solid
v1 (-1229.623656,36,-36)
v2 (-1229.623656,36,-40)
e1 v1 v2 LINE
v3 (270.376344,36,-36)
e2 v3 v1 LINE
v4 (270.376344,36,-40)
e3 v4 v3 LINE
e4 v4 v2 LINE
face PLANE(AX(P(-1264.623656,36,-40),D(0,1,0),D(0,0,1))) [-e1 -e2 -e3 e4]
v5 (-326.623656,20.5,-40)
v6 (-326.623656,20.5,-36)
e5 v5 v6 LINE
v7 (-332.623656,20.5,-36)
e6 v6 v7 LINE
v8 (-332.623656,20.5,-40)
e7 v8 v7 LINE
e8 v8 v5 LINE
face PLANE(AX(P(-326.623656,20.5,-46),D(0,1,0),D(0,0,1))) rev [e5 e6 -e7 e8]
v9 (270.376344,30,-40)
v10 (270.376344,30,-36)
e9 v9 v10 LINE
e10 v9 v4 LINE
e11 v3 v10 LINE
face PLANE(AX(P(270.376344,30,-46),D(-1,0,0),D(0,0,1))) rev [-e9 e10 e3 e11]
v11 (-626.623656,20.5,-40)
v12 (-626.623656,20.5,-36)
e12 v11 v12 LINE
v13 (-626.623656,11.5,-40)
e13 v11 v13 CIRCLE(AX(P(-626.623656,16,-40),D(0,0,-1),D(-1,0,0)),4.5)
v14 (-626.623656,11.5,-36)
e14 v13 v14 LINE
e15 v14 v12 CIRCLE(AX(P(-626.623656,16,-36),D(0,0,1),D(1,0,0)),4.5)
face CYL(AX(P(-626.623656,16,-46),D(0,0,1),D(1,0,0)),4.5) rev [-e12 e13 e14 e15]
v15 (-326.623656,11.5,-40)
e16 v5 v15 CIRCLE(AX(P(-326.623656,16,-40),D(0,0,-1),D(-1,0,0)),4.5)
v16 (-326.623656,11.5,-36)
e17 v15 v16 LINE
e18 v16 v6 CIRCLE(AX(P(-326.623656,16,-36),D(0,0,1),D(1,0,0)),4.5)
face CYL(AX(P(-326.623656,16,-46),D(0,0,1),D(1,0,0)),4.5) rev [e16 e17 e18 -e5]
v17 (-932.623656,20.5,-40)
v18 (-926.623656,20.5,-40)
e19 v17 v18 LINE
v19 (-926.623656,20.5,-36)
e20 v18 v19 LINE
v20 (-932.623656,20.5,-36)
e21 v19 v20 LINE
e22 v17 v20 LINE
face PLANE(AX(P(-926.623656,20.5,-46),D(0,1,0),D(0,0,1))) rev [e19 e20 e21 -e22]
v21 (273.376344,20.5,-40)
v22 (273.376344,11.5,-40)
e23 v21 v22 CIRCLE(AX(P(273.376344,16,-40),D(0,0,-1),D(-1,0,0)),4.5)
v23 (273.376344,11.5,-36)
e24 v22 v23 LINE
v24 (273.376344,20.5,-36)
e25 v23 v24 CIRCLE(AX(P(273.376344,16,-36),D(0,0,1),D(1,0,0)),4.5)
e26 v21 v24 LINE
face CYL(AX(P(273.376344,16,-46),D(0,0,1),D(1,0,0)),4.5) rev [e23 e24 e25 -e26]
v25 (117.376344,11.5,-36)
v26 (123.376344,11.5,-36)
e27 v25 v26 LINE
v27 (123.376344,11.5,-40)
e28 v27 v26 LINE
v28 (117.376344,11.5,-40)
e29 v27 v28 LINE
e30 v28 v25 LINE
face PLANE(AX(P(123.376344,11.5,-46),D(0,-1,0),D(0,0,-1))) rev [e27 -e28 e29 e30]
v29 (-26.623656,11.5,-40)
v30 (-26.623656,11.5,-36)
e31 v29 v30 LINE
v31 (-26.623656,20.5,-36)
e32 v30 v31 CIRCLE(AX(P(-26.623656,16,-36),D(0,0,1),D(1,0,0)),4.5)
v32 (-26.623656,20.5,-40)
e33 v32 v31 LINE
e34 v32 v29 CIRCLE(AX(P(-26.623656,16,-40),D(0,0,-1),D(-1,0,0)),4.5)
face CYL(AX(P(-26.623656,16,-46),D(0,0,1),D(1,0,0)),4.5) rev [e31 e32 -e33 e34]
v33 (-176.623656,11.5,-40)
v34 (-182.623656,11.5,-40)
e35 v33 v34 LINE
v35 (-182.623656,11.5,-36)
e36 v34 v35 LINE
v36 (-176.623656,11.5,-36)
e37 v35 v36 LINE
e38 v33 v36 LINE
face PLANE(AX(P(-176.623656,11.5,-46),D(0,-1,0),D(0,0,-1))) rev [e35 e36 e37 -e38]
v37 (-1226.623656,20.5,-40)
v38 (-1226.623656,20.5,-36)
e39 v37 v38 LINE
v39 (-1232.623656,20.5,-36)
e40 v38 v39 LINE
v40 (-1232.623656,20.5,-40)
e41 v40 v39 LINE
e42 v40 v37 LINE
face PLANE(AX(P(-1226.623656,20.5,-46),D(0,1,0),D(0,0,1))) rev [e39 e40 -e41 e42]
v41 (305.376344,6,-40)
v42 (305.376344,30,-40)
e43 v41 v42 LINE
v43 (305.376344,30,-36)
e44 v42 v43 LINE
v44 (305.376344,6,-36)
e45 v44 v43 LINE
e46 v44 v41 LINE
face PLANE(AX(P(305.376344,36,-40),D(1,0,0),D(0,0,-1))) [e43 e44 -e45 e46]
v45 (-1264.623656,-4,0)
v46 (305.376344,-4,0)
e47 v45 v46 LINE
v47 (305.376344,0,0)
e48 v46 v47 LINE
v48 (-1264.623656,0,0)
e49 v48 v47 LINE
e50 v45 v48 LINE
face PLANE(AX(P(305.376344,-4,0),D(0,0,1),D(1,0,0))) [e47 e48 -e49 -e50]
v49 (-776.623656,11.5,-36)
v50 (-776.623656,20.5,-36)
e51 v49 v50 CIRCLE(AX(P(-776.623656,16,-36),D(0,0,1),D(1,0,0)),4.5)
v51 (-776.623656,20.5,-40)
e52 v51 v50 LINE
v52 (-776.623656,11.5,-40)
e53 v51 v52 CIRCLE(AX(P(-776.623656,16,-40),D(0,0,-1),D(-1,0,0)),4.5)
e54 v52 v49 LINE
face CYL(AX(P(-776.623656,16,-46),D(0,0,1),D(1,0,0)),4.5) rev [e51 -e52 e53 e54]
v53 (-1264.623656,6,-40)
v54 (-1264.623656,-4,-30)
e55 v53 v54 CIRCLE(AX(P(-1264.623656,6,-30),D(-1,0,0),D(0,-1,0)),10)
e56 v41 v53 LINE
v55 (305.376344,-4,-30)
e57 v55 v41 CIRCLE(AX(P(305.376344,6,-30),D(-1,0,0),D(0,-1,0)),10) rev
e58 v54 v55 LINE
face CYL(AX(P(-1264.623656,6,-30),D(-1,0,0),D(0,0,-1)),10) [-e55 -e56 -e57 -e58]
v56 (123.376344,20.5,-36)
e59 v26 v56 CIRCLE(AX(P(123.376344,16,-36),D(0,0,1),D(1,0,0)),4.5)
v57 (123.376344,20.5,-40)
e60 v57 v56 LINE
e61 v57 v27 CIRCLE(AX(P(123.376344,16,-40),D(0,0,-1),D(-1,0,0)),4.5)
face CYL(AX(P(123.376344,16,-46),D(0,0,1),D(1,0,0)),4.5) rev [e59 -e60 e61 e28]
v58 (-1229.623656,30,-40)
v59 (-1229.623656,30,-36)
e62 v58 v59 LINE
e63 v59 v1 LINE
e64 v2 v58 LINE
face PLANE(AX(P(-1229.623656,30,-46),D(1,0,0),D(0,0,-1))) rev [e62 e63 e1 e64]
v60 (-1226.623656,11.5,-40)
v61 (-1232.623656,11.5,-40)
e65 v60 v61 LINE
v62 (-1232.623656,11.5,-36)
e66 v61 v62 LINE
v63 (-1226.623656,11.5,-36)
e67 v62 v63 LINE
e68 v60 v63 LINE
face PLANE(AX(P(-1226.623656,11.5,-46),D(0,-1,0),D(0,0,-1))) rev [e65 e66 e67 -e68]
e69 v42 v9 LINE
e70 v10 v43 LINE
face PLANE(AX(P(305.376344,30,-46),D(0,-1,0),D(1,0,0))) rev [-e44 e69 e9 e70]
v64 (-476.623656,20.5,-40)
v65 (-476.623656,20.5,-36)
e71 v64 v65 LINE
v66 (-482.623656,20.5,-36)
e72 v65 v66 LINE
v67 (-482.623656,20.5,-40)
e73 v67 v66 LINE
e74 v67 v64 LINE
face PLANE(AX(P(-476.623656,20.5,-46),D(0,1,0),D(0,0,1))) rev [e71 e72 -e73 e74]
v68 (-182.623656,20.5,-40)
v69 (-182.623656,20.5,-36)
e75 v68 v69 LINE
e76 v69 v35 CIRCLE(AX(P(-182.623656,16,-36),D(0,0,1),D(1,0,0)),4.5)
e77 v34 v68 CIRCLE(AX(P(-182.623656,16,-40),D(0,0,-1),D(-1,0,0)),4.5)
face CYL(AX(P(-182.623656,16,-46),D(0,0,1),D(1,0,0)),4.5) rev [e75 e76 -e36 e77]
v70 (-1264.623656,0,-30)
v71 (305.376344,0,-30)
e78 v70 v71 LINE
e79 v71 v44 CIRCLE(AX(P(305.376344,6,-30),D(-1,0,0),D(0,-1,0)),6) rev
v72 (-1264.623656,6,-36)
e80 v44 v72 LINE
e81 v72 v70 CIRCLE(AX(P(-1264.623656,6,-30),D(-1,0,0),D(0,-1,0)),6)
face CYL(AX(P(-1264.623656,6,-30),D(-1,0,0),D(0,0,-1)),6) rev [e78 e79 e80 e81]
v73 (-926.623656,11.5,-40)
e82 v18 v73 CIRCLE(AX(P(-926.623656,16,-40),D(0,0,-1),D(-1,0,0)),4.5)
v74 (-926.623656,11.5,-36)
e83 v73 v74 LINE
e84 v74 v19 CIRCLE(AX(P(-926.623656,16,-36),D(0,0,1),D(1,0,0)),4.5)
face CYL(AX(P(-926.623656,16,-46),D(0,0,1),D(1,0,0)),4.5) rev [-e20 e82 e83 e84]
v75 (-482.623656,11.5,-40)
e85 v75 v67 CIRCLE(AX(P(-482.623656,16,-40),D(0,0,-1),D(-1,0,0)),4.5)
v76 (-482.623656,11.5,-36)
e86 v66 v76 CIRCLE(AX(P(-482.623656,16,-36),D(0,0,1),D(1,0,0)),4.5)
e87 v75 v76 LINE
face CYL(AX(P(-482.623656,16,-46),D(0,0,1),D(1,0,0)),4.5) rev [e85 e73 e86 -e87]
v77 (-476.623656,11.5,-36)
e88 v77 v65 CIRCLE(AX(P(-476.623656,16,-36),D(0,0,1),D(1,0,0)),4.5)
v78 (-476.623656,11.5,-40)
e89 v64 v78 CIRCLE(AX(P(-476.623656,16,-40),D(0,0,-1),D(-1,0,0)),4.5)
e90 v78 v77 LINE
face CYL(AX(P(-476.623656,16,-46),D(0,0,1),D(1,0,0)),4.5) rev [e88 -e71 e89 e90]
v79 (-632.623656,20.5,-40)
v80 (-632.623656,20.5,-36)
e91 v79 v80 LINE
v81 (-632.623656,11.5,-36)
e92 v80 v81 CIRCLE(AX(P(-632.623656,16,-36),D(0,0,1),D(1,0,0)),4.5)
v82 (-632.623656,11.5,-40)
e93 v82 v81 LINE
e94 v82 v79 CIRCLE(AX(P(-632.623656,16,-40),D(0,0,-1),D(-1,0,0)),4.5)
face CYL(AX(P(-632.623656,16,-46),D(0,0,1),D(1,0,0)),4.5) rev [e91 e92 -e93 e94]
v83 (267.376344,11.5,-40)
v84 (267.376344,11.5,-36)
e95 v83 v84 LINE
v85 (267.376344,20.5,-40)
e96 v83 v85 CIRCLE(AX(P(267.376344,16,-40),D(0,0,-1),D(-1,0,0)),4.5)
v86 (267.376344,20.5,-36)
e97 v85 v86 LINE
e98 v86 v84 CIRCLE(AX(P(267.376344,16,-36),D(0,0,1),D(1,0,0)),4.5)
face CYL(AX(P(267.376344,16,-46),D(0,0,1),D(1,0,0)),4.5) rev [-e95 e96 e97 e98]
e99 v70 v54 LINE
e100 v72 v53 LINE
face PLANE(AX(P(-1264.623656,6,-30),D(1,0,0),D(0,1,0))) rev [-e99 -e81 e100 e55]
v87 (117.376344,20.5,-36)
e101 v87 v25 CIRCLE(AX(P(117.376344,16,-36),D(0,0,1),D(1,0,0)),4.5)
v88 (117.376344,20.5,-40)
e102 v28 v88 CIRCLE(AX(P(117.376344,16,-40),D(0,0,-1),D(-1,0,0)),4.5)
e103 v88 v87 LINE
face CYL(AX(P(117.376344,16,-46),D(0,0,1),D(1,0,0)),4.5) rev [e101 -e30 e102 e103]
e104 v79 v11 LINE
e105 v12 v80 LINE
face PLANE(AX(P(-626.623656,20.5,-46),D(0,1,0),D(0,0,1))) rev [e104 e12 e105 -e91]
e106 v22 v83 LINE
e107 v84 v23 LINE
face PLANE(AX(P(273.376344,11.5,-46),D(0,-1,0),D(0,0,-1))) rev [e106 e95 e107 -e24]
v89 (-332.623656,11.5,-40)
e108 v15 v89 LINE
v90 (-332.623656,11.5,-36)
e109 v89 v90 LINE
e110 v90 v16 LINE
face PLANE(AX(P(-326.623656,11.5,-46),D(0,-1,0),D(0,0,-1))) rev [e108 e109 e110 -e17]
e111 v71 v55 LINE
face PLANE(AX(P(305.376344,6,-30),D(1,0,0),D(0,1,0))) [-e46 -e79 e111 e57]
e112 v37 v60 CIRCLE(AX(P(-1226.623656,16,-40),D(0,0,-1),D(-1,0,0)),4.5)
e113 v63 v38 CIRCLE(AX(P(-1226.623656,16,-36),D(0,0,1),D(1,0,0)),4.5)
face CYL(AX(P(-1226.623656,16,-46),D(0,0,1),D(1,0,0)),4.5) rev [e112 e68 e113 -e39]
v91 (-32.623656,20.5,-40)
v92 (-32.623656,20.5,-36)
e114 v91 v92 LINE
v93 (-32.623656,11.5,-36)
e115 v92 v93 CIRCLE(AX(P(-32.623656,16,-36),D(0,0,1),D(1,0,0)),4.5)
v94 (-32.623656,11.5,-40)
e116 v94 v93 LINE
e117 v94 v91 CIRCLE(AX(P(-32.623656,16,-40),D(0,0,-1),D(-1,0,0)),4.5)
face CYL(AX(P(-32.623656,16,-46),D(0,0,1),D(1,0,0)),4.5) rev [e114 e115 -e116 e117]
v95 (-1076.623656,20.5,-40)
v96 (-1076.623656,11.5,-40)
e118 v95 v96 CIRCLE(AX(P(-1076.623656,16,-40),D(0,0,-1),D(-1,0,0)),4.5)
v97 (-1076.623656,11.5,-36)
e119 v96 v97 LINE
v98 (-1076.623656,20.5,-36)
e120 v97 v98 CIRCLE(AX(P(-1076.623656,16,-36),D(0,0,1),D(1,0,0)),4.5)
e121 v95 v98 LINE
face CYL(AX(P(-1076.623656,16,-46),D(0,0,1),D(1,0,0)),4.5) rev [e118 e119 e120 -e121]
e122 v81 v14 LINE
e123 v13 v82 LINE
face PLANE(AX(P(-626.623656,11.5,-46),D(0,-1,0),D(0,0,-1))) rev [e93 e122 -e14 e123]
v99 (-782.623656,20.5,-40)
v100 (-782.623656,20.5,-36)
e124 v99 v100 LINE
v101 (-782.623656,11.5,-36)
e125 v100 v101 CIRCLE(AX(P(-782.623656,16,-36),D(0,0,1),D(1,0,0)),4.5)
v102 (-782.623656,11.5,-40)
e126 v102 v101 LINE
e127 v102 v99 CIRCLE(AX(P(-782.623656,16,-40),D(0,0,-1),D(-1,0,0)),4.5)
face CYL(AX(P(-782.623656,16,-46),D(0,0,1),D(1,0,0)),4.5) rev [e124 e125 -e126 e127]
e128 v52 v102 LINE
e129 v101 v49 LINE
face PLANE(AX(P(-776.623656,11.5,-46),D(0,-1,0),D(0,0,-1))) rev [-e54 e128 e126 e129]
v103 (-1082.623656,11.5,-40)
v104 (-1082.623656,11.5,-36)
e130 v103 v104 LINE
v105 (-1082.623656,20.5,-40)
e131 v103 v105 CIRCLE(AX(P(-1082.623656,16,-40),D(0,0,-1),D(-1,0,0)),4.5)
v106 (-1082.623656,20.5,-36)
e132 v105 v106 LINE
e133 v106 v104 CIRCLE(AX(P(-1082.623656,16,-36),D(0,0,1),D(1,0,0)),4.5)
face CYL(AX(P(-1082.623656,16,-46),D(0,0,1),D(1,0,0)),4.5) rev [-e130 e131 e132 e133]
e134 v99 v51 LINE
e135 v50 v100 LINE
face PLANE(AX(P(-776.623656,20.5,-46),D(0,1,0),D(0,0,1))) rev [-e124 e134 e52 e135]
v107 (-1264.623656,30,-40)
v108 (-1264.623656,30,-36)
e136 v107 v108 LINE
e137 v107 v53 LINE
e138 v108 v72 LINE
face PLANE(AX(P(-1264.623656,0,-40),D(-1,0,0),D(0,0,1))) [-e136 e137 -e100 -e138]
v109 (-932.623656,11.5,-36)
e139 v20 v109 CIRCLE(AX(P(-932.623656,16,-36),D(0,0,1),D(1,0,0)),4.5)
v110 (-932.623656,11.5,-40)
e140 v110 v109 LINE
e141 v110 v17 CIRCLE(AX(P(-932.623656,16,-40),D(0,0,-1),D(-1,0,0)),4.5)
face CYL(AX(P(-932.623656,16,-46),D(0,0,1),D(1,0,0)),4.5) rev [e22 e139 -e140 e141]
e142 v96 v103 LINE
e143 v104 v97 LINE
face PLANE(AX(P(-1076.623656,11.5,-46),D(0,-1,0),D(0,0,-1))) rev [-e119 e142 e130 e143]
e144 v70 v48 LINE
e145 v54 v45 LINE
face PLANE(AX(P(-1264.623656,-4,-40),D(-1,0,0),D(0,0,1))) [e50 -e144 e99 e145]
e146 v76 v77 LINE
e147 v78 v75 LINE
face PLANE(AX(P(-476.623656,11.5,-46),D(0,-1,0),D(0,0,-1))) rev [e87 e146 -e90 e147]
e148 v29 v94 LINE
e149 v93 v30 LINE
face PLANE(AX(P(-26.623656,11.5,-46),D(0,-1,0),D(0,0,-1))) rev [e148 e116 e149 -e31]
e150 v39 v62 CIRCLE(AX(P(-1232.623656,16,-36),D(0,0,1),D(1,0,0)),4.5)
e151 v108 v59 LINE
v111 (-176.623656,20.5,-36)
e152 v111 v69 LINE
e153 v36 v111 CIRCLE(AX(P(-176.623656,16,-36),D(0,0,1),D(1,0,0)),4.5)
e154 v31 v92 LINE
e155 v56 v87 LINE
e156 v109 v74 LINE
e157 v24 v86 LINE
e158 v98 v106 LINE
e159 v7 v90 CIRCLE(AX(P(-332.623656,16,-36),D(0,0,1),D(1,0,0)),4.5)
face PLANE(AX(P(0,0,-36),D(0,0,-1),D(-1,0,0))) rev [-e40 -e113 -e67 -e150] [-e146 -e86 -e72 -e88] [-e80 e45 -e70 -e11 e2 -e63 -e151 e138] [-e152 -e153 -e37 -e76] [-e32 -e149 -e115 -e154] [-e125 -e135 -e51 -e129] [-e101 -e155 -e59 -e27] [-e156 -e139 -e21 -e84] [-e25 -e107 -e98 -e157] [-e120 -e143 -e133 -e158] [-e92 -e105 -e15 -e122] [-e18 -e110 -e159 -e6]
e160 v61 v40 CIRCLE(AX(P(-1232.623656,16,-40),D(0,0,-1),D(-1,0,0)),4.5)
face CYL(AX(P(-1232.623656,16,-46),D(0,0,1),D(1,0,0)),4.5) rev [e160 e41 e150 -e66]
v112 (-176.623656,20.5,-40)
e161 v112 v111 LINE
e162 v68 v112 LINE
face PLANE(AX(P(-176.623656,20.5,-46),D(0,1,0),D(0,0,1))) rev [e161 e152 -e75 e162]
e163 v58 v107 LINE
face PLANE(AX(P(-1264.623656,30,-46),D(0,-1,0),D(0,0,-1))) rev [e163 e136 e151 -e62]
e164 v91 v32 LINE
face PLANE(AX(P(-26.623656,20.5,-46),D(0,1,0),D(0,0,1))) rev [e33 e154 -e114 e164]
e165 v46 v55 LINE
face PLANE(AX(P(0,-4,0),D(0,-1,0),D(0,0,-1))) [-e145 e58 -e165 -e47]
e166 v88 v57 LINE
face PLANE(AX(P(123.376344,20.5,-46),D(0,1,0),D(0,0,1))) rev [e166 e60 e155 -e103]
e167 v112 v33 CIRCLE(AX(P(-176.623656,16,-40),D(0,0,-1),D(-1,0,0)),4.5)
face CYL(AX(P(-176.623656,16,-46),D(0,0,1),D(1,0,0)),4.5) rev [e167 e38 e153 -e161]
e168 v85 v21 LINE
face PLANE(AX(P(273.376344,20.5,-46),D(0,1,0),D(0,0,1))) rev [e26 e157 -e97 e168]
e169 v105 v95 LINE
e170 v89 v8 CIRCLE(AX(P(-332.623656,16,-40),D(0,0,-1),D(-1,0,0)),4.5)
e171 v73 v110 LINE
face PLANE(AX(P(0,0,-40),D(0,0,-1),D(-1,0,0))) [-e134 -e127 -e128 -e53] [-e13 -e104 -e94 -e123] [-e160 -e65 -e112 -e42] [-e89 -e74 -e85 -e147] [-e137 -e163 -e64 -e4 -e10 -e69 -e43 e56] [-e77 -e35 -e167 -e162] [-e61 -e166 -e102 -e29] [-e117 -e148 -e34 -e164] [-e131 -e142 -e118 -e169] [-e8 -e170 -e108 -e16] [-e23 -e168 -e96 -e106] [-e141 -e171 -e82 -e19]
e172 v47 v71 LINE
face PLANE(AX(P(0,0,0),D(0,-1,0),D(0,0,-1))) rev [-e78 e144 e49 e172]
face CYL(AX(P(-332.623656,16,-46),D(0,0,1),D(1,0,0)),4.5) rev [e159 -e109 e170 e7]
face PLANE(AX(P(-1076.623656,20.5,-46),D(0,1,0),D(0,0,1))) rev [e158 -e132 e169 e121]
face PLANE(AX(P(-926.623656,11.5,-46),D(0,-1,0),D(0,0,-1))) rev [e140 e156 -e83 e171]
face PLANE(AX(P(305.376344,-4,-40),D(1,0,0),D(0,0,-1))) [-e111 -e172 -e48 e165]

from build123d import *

# Parameters (mm, degrees)
SKETCH1_W                    = 1570
SKETCH1_H                    = 40
BASE_FLANGE1_DEPTH           = 4
EDGE_FLANGE1_STRIP_W         = 28
EDGE_FLANGE1_STRIP_H         = 4
EDGE_FLANGE1_STRIP_CUT_DEPTH = 1570
EDGE_FLANGE1_DEPTH           = 1570
SKETCH9_W                    = 35
SKETCH9_H                    = 6
CUT_EXTRUDE1_DEPTH           = 10
CUT_EXTRUDE2_DEPTH           = 10
LPATTERN1_COUNT              = 11
LPATTERN1_PITCH              = 150


# Sheet-metal steps are written as plain solids
with BuildPart() as part:
    # Sketch1 → Base-Flange1 (new body)
    with BuildSketch(Plane(origin=(0, 0, 0), x_dir=(1, 0, 0), z_dir=(0, 1, 0))):
        with Locations((-479.623655914, 20)):
            Rectangle(SKETCH1_W, SKETCH1_H)
    extrude(amount=-BASE_FLANGE1_DEPTH)

    # Edge-Flange1 strip (across the edge) → Edge-Flange1 strip cut (cut)
    with BuildSketch(Plane(origin=(305.376344086, 0, -40), x_dir=(0, 0, 1), z_dir=(-1, 0, 0))):
        with Locations((-4, -2)):
            Rectangle(EDGE_FLANGE1_STRIP_W, EDGE_FLANGE1_STRIP_H)
    extrude(amount=EDGE_FLANGE1_STRIP_CUT_DEPTH, mode=Mode.SUBTRACT)

    # Edge-Flange1 section (across the edge) → Edge-Flange1 (add)
    with BuildSketch(Plane(origin=(305.376344086, 0, -40), x_dir=(0, 0, 1), z_dir=(-1, 0, 0))):
        with BuildLine():
            Line((0, 6), (0, 36))
            Line((0, 36), (4, 36))
            Line((4, 36), (4, 6))
            ThreePointArc((4, 6), (5.757359313, 1.757359313), (10, 0))
            Line((10, 0), (10, -4))
            ThreePointArc((10, -4), (2.928932188, -1.071067812), (0, 6))
        make_face()
    extrude(amount=EDGE_FLANGE1_DEPTH)

    # Sketch9 → Cut-Extrude1 (cut)
    with BuildSketch(Plane.XY.offset(-36)):
        with Locations((287.876344086, 33)):
            Rectangle(SKETCH9_W, SKETCH9_H)
        with Locations((-1247.123655914, 33)):
            Rectangle(SKETCH9_W, SKETCH9_H)
    extrude(amount=-CUT_EXTRUDE1_DEPTH, mode=Mode.SUBTRACT)

    # Sketch10 → Cut-Extrude2 (cut)
    with BuildSketch(Plane.XY.offset(-36)):
        with BuildLine():
            Line((273.376344086, 11.5), (267.376344086, 11.5))
            ThreePointArc((267.376344086, 11.5), (262.876344086, 16), (267.376344086, 20.5))
            Line((267.376344086, 20.5), (273.376344086, 20.5))
            ThreePointArc((273.376344086, 20.5), (277.876344086, 16), (273.376344086, 11.5))
        make_face()
    cut_extrude2 = extrude(amount=-CUT_EXTRUDE2_DEPTH, mode=Mode.SUBTRACT)

    # LPattern1: Cut-Extrude2 ×11
    with Locations(*[(-i * LPATTERN1_PITCH, 0, 0) for i in range(1, LPATTERN1_COUNT)]):
        add(cut_extrude2, mode=Mode.SUBTRACT)


solid = part.part
